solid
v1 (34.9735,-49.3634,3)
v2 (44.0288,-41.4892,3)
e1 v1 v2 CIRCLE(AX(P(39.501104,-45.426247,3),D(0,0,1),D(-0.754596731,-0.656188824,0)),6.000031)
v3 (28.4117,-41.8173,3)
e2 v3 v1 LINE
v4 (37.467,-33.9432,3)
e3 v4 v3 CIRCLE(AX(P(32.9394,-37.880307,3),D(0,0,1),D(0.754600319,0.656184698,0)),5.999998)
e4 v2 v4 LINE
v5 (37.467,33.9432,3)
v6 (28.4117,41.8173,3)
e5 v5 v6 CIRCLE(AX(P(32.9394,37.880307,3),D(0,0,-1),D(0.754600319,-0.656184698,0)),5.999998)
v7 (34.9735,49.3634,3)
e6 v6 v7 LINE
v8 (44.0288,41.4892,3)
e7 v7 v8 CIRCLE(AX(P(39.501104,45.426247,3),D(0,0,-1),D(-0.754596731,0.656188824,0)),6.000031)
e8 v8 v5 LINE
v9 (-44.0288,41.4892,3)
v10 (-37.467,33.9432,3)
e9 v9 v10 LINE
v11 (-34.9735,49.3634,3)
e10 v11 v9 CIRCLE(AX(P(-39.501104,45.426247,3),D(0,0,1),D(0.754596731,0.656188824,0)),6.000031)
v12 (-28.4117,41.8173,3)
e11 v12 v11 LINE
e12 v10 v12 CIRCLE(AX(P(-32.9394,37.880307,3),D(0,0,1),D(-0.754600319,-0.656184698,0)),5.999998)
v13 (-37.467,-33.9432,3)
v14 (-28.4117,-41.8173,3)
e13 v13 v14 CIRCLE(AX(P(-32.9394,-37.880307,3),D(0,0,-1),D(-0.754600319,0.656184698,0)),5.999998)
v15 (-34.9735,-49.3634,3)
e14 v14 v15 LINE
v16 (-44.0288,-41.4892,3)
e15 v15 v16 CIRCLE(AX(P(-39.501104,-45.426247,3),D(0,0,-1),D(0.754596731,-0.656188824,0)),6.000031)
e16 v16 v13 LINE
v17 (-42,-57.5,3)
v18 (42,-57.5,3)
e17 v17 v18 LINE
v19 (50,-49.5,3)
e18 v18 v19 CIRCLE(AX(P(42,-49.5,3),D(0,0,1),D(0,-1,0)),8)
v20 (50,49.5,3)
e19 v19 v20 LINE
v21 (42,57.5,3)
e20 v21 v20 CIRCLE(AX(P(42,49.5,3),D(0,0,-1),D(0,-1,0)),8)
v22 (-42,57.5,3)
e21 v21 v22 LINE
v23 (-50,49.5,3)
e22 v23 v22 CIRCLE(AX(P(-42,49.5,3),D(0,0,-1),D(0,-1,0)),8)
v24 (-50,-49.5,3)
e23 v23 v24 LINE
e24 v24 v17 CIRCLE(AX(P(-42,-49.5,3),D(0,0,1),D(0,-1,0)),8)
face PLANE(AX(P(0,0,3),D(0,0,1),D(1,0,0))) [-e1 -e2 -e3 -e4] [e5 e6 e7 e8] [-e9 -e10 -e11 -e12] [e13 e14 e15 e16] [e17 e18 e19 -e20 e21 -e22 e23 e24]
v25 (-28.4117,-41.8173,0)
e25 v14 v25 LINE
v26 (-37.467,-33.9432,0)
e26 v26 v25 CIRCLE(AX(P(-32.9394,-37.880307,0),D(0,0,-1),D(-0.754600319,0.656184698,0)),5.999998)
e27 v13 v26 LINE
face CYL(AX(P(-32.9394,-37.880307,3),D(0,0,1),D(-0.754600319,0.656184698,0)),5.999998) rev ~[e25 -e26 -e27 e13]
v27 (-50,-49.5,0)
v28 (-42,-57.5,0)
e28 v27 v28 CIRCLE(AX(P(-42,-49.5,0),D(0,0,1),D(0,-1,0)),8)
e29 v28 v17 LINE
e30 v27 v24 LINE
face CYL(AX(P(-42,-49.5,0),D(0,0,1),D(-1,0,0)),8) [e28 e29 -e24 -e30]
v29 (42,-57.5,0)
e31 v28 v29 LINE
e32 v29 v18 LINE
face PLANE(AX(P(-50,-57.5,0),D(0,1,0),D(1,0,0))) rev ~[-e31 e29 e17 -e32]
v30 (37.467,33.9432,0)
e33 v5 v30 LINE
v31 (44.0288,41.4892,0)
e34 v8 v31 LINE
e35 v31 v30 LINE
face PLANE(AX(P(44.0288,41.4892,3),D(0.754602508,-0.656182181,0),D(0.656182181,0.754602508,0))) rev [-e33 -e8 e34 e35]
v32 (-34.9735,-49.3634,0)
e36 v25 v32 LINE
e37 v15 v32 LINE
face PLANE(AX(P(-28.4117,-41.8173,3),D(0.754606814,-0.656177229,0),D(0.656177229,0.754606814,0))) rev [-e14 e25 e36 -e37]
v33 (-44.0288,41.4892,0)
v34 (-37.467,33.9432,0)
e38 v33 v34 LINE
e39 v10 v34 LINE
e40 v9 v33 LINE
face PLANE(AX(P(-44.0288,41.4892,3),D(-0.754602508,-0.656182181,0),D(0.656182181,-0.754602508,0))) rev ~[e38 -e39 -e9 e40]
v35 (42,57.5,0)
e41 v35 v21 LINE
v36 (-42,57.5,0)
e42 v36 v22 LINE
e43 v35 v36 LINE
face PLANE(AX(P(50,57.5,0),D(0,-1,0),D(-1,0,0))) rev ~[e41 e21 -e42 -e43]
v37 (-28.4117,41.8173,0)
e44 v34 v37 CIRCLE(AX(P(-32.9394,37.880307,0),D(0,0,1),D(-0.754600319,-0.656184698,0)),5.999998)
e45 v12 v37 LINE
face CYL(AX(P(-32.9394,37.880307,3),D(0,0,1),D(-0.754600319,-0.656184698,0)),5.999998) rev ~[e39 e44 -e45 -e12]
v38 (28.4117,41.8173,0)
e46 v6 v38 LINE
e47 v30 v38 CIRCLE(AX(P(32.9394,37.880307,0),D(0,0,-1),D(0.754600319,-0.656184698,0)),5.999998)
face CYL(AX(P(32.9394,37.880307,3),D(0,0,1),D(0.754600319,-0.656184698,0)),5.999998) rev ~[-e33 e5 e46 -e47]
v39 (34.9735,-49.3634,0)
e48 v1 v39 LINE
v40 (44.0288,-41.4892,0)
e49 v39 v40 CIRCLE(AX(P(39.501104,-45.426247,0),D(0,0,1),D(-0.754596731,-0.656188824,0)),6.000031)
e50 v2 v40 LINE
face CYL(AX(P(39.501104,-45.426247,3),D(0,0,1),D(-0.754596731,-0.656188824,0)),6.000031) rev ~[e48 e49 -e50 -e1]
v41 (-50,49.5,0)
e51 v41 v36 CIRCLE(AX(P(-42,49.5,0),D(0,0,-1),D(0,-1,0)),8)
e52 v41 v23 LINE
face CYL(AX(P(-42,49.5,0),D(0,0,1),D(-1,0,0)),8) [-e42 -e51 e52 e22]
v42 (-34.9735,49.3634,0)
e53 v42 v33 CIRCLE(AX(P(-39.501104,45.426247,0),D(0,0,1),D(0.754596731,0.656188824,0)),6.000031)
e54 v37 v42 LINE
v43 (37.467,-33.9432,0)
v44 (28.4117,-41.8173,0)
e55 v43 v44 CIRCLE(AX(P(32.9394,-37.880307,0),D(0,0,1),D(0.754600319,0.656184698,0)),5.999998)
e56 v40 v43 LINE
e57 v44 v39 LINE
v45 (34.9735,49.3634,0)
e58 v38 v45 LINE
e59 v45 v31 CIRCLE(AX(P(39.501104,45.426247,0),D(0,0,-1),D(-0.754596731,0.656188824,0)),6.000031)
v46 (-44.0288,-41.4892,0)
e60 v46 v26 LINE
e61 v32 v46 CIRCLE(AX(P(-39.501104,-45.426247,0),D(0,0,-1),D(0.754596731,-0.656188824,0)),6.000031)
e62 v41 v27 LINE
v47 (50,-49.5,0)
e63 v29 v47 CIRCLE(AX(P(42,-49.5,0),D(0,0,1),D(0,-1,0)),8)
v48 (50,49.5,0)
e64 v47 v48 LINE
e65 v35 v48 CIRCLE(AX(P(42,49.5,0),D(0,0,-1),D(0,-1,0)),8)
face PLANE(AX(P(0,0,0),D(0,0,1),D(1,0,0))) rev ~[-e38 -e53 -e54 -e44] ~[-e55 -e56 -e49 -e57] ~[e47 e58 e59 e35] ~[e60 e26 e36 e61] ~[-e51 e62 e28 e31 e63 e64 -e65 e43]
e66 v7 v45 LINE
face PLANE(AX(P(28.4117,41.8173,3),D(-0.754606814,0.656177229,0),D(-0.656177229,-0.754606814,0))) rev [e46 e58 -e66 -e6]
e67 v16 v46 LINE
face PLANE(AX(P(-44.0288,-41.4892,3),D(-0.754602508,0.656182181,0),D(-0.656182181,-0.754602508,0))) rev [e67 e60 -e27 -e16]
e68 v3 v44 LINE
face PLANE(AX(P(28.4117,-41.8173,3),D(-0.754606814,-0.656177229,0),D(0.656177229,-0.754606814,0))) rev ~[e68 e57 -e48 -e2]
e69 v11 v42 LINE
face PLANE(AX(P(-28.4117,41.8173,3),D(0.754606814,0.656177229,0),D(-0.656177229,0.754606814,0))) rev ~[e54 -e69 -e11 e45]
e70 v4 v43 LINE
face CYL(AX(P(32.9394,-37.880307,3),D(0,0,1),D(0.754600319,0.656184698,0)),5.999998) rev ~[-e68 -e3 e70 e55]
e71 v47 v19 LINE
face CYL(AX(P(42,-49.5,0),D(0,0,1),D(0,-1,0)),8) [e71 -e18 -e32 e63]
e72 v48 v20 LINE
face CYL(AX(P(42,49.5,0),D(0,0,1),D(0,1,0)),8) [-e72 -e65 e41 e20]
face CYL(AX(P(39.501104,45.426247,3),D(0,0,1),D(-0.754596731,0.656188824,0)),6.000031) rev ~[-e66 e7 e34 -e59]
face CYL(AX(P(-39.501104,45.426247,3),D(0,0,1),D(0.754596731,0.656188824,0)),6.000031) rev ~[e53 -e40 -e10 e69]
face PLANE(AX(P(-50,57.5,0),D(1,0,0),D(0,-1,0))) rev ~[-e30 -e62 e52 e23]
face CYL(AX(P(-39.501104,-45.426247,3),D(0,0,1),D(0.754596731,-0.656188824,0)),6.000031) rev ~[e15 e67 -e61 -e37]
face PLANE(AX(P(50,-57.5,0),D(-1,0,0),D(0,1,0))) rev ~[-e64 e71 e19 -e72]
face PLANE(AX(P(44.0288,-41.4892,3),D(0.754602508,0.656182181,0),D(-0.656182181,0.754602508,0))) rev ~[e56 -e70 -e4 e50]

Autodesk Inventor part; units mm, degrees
ref_plane "YZ Plane" through (0, 0, 0) normal (1, 0, 0) x (0, 1, 0)
ref_plane "XZ Plane" through (0, 0, 0) normal (0, 1, 0) x (-1, 0, 0)
ref_plane "XY Plane" through (0, 0, 0) normal (0, 0, 1) x (1, 0, 0)
sketch "Sketch1" plane through (0, 0, 0) normal (0, 0, 1) x (1, 0, 0)
  line L0 (-50, -57.5) -> (50, -57.5)
  line L1 (50, -57.5) -> (50, 57.5)
  line L2 (50, 57.5) -> (-50, 57.5)
  line L3 (-50, 57.5) -> (-50, -57.5)
  line L4 (-50, -57.5) -> (50, 57.5) construction
  line L5 (50, -57.5) -> (-50, 57.5) construction
  point P0 (0, 0)
  dimension "d0" = 100
  dimension "d1" = 115
extrude "Plate1" add sketch "Sketch1" along normal blind 3
sketch "Sketch5" plane through (0, 0, 3) normal (0, 0, 1) x (1, 0, 0)
  line L0 (50, -57.5) -> (-50, -57.5) construction
  line L1 (50, 57.5) -> (50, -57.5) construction
  line L2 (-50, 57.5) -> (50, 57.5) construction
  line L3 (-50, -57.5) -> (-50, 57.5) construction
  line L4 (50, 57.5) -> (-50, 57.5) construction
  line L5 (-50, 57.5) -> (50, -57.5) construction
  line L6 (-39.5011, 45.4263) -> (-32.9394, 37.8803) construction
  line L7 (-44.0288, 41.4892) -> (-37.467, 33.9432)
  line L8 (-28.4117, 41.8173) -> (-34.9735, 49.3634)
  arc A0 (-34.9735, 49.3634) -> (-44.0288, 41.4892) centre (-39.5011, 45.4263) ccw
  arc A1 (-37.467, 33.9432) -> (-28.4117, 41.8173) centre (-32.9394, 37.8803) ccw
  point P0 (0, 0)
  point P1 (-36.2202, 41.6533)
  dimension "d22" = 12
  dimension "d23" = 10
  dimension "d24" = 16
extrude "Cut1" cut sketch "Sketch5" against normal blind 3
mirror "Mirror1" about plane through (0, 0, 0) normal (0, 1, 0) of "Cut1"
mirror "Mirror2" about plane through (0, 0, 0) normal (1, 0, 0) of "Cut1", "Mirror1"
fillet "Corner Round1" radius 8 4 edges at (-50, 57.5, 1.5) (50, 57.5, 1.5) (50, -57.5, 1.5) (-50, -57.5, 1.5)
equation "\"d25\" = Thickness"
equation "\"d2\" = Thickness"
equation "\"BendReliefWidth\" = Thickness"
equation "\"BendReliefDepth\" = 0.5 * Thickness"
equation "\"CornerReliefSize\" = 4 * Thickness"
equation "\"MinimumRemnant\" = 2 * Thickness"
equation "\"TransitionRadius\" = BendRadius"
equation "\"JacobiRadiusSize\" = BendRadius"
equation "\"GapSize\" = Thickness"
equation "\"Thickness\" = 3"
equation "\"BendRadius\" = 5"
properties part number "AQUA AISI304 4vv wheel plate 150" material "Stainless Steel"
